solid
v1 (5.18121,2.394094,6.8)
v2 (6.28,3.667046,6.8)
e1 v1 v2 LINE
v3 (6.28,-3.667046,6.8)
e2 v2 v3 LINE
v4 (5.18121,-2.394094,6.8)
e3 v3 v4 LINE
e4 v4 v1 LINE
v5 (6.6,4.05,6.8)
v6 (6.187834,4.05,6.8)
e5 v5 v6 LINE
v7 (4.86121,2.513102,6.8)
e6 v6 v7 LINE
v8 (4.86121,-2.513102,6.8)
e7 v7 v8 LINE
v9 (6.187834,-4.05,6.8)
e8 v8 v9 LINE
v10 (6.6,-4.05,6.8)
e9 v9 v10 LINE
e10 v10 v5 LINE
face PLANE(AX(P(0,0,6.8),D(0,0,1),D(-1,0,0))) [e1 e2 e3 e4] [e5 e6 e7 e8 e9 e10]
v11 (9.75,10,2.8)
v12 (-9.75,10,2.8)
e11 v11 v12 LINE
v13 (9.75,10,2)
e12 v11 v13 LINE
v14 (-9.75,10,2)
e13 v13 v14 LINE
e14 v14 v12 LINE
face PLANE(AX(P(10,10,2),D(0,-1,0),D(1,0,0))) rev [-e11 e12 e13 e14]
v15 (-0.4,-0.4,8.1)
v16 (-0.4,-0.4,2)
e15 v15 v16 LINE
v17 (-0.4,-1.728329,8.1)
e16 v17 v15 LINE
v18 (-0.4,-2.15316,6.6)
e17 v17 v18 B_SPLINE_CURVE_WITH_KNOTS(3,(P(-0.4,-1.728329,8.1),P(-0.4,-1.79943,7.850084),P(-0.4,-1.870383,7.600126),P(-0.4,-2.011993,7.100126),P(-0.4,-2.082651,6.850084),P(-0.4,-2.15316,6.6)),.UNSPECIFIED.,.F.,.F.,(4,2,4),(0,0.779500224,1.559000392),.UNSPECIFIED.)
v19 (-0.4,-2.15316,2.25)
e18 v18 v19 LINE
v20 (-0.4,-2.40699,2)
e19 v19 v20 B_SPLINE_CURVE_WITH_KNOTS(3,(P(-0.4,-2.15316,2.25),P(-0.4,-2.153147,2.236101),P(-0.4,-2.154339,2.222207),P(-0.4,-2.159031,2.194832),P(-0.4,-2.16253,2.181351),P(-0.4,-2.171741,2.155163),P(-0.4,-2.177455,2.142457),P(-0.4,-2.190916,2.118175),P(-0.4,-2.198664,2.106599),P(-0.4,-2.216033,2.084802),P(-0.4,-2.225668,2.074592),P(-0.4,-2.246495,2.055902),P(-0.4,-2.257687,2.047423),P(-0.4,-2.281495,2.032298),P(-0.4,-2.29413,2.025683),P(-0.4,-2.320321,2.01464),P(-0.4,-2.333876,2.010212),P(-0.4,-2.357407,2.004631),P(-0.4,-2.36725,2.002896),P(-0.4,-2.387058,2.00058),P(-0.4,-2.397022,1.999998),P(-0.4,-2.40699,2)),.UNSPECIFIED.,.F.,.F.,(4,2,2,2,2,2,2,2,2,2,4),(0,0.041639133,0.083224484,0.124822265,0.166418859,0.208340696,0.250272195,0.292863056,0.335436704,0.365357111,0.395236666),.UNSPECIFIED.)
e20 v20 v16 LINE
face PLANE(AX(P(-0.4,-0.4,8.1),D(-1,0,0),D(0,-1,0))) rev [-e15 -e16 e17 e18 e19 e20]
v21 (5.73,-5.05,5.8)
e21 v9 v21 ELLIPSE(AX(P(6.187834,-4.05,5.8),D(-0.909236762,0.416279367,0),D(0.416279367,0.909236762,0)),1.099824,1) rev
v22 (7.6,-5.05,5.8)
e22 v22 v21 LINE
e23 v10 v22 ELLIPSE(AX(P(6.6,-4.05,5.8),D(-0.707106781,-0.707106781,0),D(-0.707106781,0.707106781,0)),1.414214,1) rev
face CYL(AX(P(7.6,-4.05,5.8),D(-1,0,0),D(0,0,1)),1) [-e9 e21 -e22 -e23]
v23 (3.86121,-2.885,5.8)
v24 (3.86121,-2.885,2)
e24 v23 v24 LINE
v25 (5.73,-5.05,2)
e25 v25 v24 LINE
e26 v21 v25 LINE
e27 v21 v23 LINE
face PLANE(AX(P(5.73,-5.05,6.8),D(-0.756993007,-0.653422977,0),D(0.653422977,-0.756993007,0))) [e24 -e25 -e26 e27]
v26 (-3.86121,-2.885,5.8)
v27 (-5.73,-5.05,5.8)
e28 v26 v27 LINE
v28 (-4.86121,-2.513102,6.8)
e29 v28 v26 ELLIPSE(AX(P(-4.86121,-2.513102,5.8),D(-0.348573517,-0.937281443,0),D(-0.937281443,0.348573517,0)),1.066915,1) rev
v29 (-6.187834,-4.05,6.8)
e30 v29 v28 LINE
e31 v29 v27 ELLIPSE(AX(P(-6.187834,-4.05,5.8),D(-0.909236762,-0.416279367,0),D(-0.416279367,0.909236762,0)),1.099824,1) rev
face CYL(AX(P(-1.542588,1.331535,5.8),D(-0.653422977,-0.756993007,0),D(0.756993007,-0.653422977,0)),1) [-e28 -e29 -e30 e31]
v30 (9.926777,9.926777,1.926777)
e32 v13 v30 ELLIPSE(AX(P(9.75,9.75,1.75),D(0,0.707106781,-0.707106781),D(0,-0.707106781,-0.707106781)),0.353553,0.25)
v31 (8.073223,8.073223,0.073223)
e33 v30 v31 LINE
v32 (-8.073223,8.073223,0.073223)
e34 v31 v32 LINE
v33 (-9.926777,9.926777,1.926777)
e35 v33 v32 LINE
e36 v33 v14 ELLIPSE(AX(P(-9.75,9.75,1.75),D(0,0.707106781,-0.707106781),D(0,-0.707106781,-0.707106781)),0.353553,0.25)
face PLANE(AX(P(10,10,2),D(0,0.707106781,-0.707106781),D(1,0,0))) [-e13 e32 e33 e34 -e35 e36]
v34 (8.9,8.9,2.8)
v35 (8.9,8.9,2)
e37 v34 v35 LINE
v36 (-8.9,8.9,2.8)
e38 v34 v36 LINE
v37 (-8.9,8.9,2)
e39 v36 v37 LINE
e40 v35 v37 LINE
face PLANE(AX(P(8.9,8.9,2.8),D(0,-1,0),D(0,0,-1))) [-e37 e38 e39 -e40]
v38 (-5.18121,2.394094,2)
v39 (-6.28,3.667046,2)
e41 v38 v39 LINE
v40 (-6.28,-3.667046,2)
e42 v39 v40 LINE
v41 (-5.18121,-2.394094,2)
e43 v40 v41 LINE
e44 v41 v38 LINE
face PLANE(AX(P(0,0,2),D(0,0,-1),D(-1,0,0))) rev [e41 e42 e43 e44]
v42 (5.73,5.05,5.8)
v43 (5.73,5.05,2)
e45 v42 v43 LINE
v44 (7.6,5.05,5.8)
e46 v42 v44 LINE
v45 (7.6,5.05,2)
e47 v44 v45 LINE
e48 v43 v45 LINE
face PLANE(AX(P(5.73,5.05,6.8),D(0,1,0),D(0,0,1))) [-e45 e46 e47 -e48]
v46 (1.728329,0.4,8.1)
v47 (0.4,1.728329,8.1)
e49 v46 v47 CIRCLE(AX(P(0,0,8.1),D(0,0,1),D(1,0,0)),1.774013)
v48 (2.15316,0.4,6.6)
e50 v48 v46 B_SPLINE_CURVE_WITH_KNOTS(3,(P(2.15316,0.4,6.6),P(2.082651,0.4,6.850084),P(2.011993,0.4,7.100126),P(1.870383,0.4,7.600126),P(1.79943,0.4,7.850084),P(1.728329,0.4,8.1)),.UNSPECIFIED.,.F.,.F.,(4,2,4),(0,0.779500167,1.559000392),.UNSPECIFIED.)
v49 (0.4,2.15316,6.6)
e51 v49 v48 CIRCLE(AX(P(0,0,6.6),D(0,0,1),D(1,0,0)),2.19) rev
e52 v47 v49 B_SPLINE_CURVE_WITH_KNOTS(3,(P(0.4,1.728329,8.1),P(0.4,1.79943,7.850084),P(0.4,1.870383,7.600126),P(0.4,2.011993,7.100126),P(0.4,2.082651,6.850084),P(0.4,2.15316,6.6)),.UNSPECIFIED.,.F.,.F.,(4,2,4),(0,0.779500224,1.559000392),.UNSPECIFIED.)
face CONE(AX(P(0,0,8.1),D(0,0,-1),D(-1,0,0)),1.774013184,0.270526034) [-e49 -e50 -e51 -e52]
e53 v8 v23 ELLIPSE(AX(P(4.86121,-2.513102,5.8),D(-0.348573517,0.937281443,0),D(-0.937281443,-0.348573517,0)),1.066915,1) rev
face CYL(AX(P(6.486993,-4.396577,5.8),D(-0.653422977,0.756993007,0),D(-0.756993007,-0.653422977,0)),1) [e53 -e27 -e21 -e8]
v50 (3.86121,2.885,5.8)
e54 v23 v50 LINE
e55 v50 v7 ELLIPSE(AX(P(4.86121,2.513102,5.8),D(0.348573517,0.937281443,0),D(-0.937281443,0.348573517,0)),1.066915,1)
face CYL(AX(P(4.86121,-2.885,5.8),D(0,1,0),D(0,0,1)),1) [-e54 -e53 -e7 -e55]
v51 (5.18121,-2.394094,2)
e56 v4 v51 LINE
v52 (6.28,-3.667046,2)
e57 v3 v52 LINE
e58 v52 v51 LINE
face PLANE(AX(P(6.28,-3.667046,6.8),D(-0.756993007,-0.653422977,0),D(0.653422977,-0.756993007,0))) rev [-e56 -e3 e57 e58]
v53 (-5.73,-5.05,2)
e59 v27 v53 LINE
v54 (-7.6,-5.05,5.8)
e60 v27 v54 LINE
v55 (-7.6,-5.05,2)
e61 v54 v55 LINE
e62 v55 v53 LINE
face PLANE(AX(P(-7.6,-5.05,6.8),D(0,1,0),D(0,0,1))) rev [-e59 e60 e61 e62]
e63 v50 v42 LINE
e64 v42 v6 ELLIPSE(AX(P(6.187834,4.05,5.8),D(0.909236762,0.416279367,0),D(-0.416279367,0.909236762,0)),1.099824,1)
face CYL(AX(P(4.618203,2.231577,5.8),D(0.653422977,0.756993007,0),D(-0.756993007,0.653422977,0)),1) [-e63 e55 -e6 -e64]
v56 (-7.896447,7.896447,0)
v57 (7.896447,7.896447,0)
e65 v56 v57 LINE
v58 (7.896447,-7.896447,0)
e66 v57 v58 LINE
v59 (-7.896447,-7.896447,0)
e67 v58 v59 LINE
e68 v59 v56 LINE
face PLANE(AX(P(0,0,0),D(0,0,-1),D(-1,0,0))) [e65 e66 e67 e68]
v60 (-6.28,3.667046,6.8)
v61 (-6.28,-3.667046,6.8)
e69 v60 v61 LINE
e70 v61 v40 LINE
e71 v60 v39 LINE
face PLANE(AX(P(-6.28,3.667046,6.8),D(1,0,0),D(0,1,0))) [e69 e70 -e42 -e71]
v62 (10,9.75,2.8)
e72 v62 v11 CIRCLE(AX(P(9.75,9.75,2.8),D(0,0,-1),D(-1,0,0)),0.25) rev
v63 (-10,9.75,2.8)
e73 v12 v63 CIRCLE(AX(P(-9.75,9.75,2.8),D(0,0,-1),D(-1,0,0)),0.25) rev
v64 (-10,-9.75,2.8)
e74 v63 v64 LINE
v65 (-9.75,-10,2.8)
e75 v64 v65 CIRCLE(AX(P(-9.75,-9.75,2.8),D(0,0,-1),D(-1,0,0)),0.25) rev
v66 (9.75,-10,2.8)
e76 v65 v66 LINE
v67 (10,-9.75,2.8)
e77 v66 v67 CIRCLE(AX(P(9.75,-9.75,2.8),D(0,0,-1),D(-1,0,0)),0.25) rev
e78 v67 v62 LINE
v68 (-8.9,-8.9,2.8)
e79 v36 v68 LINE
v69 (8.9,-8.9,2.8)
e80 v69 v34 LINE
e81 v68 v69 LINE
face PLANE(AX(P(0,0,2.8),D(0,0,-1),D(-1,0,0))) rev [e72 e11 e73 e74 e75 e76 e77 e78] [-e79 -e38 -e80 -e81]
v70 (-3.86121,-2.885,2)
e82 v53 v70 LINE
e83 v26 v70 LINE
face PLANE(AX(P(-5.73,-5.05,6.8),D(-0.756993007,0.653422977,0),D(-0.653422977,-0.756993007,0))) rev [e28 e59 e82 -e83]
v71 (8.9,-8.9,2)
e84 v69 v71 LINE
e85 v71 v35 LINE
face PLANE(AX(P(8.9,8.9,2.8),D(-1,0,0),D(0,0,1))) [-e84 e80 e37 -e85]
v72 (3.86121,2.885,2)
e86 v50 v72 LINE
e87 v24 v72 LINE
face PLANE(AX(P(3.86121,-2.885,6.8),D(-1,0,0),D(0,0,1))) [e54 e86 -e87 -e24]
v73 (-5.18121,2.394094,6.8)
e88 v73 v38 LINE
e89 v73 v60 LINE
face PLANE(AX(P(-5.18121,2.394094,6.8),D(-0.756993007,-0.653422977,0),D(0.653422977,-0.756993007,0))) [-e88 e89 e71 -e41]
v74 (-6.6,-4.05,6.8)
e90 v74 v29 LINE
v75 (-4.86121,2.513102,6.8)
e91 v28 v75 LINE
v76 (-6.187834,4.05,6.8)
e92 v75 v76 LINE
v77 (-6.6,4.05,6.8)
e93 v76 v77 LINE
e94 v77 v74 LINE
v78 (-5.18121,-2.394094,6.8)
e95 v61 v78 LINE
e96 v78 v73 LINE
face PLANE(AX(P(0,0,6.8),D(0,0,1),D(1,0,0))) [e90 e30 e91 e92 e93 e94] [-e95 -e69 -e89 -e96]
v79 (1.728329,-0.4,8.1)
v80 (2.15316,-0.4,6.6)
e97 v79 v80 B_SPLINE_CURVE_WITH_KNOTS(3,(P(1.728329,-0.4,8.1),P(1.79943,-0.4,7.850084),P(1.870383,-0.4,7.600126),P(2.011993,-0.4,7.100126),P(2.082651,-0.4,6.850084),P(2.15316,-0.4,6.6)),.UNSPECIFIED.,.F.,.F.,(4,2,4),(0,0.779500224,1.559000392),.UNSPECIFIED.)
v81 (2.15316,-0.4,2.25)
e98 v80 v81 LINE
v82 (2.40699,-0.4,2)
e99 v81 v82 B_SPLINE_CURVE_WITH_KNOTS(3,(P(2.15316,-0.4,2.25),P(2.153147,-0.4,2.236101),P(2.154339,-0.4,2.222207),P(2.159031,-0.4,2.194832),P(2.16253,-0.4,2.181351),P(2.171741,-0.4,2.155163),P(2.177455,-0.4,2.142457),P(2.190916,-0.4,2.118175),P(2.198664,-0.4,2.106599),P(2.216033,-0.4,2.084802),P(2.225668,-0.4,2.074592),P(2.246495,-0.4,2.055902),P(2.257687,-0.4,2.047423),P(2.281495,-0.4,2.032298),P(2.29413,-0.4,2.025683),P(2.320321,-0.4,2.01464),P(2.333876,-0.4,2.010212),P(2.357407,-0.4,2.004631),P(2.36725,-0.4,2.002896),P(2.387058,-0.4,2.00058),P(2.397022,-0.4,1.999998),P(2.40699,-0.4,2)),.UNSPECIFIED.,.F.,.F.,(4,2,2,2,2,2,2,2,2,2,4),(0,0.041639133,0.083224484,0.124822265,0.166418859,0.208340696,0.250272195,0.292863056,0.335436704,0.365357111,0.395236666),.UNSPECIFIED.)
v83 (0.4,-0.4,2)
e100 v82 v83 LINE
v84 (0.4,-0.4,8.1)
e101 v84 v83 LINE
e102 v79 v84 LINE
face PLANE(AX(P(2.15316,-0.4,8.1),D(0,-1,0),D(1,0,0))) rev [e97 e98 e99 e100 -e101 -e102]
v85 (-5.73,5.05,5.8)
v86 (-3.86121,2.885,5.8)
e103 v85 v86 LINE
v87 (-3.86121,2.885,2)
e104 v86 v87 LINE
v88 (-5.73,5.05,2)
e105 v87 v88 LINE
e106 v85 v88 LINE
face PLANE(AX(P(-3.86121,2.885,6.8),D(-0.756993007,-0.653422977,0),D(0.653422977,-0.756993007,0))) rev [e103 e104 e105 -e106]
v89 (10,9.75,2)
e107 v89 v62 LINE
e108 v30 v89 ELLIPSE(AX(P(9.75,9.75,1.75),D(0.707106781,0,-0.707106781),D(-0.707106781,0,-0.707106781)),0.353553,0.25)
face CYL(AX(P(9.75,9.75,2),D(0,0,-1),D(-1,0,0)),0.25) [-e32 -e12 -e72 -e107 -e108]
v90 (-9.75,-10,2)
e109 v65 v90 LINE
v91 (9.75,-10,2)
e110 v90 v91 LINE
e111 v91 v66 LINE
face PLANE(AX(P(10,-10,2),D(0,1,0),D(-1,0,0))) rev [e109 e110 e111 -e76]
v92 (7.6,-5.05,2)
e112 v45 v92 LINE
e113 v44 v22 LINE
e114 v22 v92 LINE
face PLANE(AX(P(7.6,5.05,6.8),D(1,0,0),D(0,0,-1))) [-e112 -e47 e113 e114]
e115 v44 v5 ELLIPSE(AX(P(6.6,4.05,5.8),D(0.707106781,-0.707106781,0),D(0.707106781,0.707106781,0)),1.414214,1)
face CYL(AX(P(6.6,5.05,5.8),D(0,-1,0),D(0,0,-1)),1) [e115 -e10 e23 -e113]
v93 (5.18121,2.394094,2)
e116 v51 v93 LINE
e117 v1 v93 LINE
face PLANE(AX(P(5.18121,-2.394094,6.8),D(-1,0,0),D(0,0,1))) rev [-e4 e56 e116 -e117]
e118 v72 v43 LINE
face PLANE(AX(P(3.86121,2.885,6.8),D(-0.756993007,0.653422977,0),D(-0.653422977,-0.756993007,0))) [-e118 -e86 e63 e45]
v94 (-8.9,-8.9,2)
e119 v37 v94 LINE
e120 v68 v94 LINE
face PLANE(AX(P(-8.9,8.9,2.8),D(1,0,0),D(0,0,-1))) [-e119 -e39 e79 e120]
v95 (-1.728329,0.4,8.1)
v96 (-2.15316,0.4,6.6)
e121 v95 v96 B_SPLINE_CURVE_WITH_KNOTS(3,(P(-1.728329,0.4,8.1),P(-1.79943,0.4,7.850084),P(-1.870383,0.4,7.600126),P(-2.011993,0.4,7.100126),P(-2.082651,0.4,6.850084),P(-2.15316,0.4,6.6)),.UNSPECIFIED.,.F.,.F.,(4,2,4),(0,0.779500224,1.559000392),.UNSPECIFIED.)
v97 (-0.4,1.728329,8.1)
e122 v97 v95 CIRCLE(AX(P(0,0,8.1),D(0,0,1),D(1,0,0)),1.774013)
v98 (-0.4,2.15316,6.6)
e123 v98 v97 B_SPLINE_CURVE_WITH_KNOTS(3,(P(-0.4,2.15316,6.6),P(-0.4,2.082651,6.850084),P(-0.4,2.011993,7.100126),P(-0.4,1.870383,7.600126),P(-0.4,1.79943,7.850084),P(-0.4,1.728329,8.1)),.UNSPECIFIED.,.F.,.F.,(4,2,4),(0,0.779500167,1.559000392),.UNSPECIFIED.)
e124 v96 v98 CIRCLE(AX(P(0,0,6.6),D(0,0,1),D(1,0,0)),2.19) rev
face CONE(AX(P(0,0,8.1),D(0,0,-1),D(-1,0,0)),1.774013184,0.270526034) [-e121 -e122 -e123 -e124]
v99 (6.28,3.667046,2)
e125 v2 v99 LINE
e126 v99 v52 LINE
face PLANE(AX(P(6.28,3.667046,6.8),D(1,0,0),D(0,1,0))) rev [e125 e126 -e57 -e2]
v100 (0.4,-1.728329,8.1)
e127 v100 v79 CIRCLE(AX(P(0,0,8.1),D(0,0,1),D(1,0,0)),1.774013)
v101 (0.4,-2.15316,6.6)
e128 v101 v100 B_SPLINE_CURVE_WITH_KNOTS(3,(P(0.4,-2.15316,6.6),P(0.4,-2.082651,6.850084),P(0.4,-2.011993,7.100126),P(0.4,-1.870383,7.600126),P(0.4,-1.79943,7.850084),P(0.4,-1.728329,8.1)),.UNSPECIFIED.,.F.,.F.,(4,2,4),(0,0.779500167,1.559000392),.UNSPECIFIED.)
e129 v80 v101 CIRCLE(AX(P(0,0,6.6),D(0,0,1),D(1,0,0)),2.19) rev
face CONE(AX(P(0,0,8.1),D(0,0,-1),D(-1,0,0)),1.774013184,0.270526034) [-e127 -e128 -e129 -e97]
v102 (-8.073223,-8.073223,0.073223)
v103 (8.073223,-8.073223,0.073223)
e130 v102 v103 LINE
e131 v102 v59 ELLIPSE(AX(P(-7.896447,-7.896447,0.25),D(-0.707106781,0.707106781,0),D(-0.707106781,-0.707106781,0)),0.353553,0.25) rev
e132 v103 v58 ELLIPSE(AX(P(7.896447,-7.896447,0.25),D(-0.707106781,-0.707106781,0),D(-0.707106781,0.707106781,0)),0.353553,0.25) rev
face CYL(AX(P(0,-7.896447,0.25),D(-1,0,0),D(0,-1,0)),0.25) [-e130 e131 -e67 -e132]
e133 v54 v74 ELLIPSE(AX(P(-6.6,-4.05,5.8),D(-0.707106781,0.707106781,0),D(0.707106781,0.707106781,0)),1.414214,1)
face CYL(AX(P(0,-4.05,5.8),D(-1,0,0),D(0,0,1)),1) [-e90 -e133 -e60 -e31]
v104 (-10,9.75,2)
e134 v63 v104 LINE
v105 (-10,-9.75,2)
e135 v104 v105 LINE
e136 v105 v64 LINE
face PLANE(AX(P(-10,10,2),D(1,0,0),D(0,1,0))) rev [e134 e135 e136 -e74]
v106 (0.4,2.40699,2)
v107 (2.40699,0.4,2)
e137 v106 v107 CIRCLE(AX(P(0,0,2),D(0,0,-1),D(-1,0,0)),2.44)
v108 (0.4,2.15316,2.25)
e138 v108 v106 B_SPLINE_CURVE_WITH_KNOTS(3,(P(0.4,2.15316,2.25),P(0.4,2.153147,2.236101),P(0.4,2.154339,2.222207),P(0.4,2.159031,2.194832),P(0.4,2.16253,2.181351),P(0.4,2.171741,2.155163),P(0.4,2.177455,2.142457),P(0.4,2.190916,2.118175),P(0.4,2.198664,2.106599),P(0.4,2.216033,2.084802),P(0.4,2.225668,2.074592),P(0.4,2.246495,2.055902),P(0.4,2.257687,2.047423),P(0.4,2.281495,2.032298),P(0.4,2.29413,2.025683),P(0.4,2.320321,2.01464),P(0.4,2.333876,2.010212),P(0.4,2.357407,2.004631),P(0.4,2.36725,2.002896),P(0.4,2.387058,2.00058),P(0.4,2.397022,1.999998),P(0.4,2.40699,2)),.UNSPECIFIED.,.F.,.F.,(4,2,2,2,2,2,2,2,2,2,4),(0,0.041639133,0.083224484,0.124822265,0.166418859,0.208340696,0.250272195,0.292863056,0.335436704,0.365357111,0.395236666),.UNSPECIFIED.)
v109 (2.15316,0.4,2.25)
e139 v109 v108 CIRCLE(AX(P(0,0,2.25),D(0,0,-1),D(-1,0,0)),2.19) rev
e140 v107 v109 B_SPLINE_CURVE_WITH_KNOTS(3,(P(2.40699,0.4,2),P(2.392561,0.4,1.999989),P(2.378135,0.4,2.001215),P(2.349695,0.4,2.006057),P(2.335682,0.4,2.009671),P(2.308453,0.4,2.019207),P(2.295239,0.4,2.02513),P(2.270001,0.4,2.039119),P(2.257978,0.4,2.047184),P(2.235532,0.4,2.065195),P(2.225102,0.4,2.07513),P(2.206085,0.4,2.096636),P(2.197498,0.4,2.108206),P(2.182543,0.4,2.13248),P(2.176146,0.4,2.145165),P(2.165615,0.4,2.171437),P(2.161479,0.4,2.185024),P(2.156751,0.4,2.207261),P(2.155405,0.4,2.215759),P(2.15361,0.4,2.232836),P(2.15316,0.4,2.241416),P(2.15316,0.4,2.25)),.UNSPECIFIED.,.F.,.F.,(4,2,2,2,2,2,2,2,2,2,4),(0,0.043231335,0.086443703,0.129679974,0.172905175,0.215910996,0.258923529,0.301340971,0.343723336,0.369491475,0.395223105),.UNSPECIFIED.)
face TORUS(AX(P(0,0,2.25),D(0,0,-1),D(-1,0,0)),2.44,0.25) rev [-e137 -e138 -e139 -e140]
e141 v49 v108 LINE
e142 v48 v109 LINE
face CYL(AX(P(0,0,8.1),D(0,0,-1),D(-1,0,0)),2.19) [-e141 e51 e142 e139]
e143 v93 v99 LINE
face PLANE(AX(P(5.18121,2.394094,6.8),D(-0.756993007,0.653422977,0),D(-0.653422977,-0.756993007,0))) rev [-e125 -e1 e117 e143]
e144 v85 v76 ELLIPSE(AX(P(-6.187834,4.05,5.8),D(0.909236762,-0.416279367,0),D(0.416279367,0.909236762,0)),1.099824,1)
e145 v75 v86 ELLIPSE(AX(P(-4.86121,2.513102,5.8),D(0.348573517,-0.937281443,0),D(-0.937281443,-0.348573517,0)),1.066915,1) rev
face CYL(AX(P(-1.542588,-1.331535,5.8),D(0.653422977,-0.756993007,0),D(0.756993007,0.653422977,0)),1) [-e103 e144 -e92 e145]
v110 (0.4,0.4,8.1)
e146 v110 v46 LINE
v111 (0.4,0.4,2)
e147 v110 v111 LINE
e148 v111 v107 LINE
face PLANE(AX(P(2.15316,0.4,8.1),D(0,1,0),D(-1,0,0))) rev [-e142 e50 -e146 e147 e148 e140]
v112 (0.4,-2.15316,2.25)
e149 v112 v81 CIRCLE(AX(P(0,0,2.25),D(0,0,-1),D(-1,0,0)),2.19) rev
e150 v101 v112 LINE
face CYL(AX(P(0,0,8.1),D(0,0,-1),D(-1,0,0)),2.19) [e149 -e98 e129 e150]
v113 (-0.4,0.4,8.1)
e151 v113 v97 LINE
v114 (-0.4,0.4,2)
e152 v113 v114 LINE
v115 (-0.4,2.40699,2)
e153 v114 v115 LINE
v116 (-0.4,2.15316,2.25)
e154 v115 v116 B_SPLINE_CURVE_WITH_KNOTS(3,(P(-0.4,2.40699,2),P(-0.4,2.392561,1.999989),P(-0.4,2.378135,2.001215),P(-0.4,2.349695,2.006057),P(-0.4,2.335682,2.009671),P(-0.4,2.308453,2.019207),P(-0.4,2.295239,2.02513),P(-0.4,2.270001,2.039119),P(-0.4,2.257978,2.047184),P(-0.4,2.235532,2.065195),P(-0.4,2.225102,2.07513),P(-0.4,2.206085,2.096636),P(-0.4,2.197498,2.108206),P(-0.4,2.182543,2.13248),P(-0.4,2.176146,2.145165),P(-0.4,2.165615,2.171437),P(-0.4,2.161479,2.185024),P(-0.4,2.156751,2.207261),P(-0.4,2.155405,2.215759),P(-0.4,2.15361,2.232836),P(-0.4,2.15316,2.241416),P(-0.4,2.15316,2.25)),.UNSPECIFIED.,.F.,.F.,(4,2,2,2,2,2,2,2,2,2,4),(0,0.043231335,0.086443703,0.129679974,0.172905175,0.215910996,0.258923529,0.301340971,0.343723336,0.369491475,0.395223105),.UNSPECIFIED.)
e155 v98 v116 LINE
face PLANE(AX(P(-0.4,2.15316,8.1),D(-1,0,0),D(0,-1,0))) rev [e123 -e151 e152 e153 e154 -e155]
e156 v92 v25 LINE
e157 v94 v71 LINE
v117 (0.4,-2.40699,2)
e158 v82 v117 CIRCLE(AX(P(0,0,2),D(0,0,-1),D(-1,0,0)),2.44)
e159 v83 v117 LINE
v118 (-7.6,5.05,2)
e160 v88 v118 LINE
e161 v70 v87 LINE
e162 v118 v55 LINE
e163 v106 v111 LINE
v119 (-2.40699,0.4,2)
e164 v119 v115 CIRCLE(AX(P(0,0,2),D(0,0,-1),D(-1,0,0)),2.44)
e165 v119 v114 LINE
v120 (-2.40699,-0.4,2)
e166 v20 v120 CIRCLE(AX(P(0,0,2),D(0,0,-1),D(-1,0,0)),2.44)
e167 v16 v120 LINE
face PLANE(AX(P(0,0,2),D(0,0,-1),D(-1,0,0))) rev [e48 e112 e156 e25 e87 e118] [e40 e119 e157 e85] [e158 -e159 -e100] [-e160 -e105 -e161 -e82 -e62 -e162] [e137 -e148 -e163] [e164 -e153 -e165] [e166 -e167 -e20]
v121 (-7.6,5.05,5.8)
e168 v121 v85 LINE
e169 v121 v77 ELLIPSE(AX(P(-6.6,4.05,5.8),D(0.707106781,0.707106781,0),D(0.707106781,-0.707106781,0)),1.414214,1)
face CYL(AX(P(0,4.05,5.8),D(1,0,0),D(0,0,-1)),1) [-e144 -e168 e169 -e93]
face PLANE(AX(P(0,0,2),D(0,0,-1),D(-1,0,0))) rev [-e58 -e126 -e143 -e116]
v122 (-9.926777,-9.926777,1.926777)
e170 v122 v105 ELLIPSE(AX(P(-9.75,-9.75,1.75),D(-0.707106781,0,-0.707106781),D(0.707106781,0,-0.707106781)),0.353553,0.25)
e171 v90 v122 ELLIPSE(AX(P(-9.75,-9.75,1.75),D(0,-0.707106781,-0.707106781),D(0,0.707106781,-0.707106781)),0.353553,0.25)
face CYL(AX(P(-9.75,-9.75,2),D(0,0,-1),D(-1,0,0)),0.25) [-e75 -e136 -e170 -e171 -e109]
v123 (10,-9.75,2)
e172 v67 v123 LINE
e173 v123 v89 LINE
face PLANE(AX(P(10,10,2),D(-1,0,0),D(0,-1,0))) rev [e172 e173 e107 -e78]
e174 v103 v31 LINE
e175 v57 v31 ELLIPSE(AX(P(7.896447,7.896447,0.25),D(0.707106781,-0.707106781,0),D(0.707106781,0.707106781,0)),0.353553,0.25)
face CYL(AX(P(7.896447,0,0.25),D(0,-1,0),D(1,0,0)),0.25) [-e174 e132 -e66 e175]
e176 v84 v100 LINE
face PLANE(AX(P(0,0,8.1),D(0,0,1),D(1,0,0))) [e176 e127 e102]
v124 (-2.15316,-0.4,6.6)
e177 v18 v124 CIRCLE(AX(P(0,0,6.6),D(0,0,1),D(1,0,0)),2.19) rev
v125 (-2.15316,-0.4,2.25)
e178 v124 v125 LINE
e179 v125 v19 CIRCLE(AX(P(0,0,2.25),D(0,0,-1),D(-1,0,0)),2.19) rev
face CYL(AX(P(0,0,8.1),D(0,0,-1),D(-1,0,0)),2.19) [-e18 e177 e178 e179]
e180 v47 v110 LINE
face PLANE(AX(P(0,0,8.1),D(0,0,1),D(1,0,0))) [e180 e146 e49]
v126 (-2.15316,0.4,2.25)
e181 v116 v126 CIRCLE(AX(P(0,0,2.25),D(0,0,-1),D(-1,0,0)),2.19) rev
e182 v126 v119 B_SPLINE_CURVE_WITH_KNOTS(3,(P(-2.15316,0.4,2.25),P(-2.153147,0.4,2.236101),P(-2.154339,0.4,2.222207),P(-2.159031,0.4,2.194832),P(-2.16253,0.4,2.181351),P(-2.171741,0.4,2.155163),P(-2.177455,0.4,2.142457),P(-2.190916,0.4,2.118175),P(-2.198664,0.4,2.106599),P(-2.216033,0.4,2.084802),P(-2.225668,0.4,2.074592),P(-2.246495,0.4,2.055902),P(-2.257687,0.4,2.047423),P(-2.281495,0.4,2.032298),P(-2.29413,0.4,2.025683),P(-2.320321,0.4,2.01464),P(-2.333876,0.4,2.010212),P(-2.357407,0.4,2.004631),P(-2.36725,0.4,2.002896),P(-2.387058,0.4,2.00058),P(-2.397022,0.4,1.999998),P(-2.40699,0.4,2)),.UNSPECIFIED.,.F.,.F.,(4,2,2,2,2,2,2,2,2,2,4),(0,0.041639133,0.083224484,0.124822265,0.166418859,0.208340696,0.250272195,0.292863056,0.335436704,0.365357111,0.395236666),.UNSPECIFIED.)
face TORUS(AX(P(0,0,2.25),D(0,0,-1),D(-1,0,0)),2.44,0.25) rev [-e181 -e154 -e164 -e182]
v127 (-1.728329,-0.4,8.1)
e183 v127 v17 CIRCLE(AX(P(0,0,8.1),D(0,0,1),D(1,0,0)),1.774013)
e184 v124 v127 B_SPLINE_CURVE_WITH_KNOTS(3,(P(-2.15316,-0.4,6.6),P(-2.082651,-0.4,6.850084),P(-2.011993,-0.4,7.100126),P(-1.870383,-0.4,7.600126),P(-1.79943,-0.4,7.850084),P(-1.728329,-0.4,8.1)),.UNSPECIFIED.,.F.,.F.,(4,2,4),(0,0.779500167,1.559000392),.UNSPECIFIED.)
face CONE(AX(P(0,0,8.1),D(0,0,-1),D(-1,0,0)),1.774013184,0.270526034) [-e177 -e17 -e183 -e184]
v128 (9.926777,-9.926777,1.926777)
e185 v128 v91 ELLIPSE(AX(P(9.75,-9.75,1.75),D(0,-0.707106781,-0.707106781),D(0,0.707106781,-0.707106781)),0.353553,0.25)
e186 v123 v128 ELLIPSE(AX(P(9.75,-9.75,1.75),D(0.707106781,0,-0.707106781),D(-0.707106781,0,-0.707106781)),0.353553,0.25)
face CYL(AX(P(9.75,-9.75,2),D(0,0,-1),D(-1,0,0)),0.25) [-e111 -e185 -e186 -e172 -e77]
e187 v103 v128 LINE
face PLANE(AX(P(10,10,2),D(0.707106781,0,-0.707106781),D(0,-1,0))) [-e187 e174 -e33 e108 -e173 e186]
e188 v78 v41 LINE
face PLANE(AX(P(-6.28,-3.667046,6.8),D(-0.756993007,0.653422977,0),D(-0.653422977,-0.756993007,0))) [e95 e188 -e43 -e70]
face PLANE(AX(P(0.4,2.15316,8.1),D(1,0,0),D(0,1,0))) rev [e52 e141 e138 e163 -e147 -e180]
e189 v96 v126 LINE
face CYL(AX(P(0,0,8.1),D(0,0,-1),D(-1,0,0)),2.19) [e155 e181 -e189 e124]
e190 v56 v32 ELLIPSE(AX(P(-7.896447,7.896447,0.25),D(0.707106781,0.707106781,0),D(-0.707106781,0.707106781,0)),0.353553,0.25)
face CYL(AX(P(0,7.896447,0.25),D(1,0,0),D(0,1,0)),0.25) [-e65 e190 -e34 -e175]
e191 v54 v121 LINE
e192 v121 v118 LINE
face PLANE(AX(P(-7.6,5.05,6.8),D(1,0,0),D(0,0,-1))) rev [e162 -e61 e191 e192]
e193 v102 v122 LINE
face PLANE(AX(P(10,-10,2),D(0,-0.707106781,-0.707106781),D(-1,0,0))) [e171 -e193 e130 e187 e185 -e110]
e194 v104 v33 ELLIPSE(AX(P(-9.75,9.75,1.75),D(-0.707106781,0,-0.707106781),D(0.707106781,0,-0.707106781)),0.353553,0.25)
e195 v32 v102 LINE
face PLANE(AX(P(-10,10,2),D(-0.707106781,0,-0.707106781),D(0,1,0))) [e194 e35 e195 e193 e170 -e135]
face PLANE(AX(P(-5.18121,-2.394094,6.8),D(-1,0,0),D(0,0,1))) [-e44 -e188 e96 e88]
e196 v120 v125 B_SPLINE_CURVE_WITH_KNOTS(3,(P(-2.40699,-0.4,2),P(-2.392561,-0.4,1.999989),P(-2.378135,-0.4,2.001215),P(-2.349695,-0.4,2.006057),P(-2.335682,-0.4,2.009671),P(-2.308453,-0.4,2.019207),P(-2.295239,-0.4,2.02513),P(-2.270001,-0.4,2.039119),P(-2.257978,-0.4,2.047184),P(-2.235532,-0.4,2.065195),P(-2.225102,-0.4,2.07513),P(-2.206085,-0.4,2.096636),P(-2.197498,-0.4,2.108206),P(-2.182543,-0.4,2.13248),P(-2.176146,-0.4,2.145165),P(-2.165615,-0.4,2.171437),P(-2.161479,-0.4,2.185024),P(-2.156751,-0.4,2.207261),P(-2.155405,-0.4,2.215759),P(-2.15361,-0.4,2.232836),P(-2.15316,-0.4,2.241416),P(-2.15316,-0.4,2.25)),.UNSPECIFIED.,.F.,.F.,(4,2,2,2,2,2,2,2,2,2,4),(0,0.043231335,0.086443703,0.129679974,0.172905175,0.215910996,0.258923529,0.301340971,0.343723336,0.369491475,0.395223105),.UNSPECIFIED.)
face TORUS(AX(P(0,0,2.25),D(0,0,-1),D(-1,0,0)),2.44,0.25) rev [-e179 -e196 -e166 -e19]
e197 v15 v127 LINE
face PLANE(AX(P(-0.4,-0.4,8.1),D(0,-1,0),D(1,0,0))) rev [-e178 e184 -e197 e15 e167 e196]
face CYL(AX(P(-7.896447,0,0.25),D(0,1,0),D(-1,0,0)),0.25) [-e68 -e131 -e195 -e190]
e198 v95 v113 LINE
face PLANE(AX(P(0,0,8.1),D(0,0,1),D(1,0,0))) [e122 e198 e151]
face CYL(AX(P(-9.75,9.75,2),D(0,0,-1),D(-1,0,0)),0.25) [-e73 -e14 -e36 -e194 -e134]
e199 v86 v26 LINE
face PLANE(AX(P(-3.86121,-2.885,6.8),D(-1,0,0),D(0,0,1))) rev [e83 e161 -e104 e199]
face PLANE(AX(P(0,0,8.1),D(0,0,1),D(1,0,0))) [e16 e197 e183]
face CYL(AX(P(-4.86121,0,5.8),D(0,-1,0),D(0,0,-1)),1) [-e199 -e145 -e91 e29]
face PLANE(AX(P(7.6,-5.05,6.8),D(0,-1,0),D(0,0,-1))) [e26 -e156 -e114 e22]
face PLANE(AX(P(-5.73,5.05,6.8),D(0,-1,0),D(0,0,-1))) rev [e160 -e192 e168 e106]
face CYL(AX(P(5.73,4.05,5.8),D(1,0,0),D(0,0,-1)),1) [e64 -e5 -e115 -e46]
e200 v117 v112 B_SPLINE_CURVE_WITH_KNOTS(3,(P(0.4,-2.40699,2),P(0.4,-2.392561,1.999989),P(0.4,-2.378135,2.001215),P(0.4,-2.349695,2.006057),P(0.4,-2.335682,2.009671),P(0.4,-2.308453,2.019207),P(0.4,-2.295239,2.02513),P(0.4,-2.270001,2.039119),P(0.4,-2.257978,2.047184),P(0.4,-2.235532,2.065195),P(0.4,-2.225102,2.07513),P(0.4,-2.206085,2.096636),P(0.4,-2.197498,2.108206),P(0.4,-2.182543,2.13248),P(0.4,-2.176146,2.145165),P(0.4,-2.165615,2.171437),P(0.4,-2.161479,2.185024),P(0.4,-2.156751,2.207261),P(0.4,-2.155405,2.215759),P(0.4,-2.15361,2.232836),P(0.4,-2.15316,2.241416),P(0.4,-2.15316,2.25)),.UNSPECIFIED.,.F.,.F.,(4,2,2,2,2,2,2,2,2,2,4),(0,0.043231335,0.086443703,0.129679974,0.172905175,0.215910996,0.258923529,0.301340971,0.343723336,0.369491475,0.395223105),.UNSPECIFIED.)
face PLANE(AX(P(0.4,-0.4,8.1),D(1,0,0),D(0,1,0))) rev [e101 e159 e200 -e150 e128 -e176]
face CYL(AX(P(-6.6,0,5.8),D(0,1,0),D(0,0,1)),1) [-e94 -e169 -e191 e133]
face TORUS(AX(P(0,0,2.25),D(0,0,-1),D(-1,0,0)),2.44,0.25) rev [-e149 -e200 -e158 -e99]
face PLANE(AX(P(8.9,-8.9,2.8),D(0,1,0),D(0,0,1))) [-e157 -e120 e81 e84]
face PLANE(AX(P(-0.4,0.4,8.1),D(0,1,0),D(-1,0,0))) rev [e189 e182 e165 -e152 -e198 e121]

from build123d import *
from OCP.BRepFilletAPI import BRepFilletAPI_MakeChamfer

# Parameters (mm, degrees)
SKETCH3_W           = 20
SKETCH3_H           = 20
BOSS_EXTRUDE1_DEPTH = 2
SKETCH4_W           = 20
SKETCH4_H           = 20
SKETCH4_W_2         = 17.8
SKETCH4_H_2         = 17.8
BOSS_EXTRUDE2_DEPTH = 0.8
CHAMFER1_SIZE       = 2
BOSS_EXTRUDE3_DEPTH = 4.8
FILLET2_R           = 1
FILLET4_R           = 1
BOSS_EXTRUDE4_DEPTH = 6.1
CHAMFER2_SIZE       = 1.5
CHAMFER2_SIZE2      = 0.415986816
FILLET5_R           = 0.25
FILLET6_R           = 0.25


with BuildPart() as part:
    # Sketch3 → Boss-Extrude1 (new body)
    with BuildSketch(Plane.XY):
        Rectangle(SKETCH3_W, SKETCH3_H)
    extrude(amount=BOSS_EXTRUDE1_DEPTH)

    # Sketch4 → Boss-Extrude2 (add)
    with BuildSketch(Plane.XY.offset(2)):
        Rectangle(SKETCH4_W, SKETCH4_H)
        Rectangle(SKETCH4_W_2, SKETCH4_H_2, mode=Mode.SUBTRACT)
    extrude(amount=BOSS_EXTRUDE2_DEPTH)

    # Chamfer1
    chamfer1_edges = [part.edges().sort_by_distance(p)[0] for p in [
        (0, 10, 0),
        (10, 0, 0),
        (0, -10, 0),
        (-10, 0, 0),
    ]]
    chamfer(chamfer1_edges, length=CHAMFER1_SIZE)

    # Sketch7 → Boss-Extrude3 (add)
    with BuildSketch(Plane.XY.offset(2)):
        Polygon((-7.6, 5.05), (-7.6, -5.05), (-5.73, -5.05), (-3.861210285, -2.885), (-3.861210285, 2.885), (-5.73, 5.05), align=None)
        Polygon((-5.181210285, -2.394094045), (-5.181210285, 2.394094045), (-6.28, 3.667046113), (-6.28, -3.667046113), align=None, mode=Mode.SUBTRACT)
    boss_extrude3 = extrude(amount=BOSS_EXTRUDE3_DEPTH)

    # Mirror1: Boss-Extrude3 across plane
    add(boss_extrude3.mirror(Plane(origin=(0, 0, 0), x_dir=(0, 0, 1), z_dir=(1, 0, 0))))

    # Fillet2
    fillet2_edges = [part.edges().sort_by_distance(p)[0] for p in [
        (-6.665, 5.05, 6.8),
        (-7.6, 0, 6.8),
        (-6.665, -5.05, 6.8),
        (-4.795605142, -3.9675, 6.8),
        (-3.861210285, 0, 6.8),
        (-4.795605142, 3.9675, 6.8),
    ]]
    fillet(fillet2_edges, radius=FILLET2_R)

    # Fillet4
    fillet4_edges = [part.edges().sort_by_distance(p)[0] for p in [
        (6.665, 5.05, 6.8),
        (4.795605142, 3.9675, 6.8),
        (3.861210285, 0, 6.8),
        (4.795605142, -3.9675, 6.8),
        (6.665, -5.05, 6.8),
        (7.6, 0, 6.8),
    ]]
    fillet(fillet4_edges, radius=FILLET4_R)

    # Sketch8 → Boss-Extrude4 (add)
    with BuildSketch(Plane.XY.offset(2)):
        with BuildLine():
            Line((-0.4, 2.153160468), (-0.4, 0.4))
            Line((-0.4, 0.4), (-2.153160468, 0.4))
            ThreePointArc((-2.153160468, 0.4), (-1.548563851, 1.548563851), (-0.4, 2.153160468))
        make_face()
        with BuildLine():
            Line((0.4, 2.153160468), (0.4, 0.4))
            Line((0.4, 0.4), (2.153160468, 0.4))
            ThreePointArc((2.153160468, 0.4), (1.548563851, 1.548563851), (0.4, 2.153160468))
        make_face()
        with BuildLine():
            Line((2.153160468, -0.4), (0.4, -0.4))
            Line((0.4, -0.4), (0.4, -2.153160468))
            ThreePointArc((0.4, -2.153160468), (1.548563851, -1.548563851), (2.153160468, -0.4))
        make_face()
        with BuildLine():
            Line((-0.4, -0.4), (-2.153160468, -0.4))
            ThreePointArc((-2.153160468, -0.4), (-1.548563851, -1.548563851), (-0.4, -2.153160468))
            Line((-0.4, -2.153160468), (-0.4, -0.4))
        make_face()
    extrude(amount=BOSS_EXTRUDE4_DEPTH)

    # Chamfer2: one chamfer whose edges measure the first distance from different faces: ONE call of the kernel's chamfer builder (chamfer() names one face for all edges)
    chamfer2_edges_1 = [part.edges().sort_by_distance(p)[0] for p in [
        (1.548563851, 1.548563851, 8.1),
    ]]
    chamfer2_side_1 = [part.faces().sort_by_distance(p)[0] for p in [
        (1.548563851, 1.548563851, 5.05),
    ]]
    chamfer2_edges_2 = [part.edges().sort_by_distance(p)[0] for p in [
        (-1.548563851, 1.548563851, 8.1),
    ]]
    chamfer2_side_2 = [part.faces().sort_by_distance(p)[0] for p in [
        (-1.548563851, 1.548563851, 5.05),
    ]]
    chamfer2_edges_3 = [part.edges().sort_by_distance(p)[0] for p in [
        (1.548563851, -1.548563851, 8.1),
    ]]
    chamfer2_side_3 = [part.faces().sort_by_distance(p)[0] for p in [
        (1.548563851, -1.548563851, 5.05),
    ]]
    chamfer2_edges_4 = [part.edges().sort_by_distance(p)[0] for p in [
        (-1.548563851, -1.548563851, 8.1),
    ]]
    chamfer2_side_4 = [part.faces().sort_by_distance(p)[0] for p in [
        (-1.548563851, -1.548563851, 5.05),
    ]]
    chamfer2 = BRepFilletAPI_MakeChamfer(part.part.solid().wrapped)
    for e in chamfer2_edges_1:
        chamfer2.Add(CHAMFER2_SIZE, CHAMFER2_SIZE2, e.wrapped, chamfer2_side_1[0].wrapped)  # the first distance lies on this face
    for e in chamfer2_edges_2:
        chamfer2.Add(CHAMFER2_SIZE, CHAMFER2_SIZE2, e.wrapped, chamfer2_side_2[0].wrapped)  # the first distance lies on this face
    for e in chamfer2_edges_3:
        chamfer2.Add(CHAMFER2_SIZE, CHAMFER2_SIZE2, e.wrapped, chamfer2_side_3[0].wrapped)  # the first distance lies on this face
    for e in chamfer2_edges_4:
        chamfer2.Add(CHAMFER2_SIZE, CHAMFER2_SIZE2, e.wrapped, chamfer2_side_4[0].wrapped)  # the first distance lies on this face
    add(Compound.cast(chamfer2.Shape()), mode=Mode.REPLACE)

    # Fillet5
    # the kernel refuses this fillet: 0.25 mm, written as the material it adds along each edge
    with BuildSketch(Plane(origin=(0, 0, 2), x_dir=(0.9948253006506458, -0.10160030110857103, 0), z_dir=(-0.10160030110857103, -0.9948253006506458, 0))) as fillet5_piece_1_section:
        with BuildLine():
            CenterArc((2.19 + FILLET5_R, FILLET5_R), FILLET5_R, 180, 90)
            Line((2.19, FILLET5_R), (2.19, 0))
            Line((2.19, 0), (2.19 + FILLET5_R, 0))
        make_face()
    fillet5_piece_1 = revolve(axis=Axis((0, 0, 2), (0, 0, 1)), revolution_arc=101.662660771, mode=Mode.PRIVATE)
    fillet5_piece_1 = split(fillet5_piece_1, bisect_by=Plane(origin=(0.4, 1.598681541, 2.070877118), z_dir=(1, 0, 0)), keep=Keep.TOP, mode=Mode.PRIVATE)
    fillet5_piece_1 = split(fillet5_piece_1, bisect_by=Plane(origin=(1.598681541, 0.4, 2.070877118), z_dir=(0, 1, 0)), keep=Keep.TOP, mode=Mode.PRIVATE)
    add(fillet5_piece_1)
    with BuildSketch(Plane(origin=(0, 0, 2), x_dir=(-0.9948253006506458, -0.10160030110857048, 0), z_dir=(0.10160030110857048, -0.9948253006506458, 0))) as fillet5_piece_2_section:
        with BuildLine():
            CenterArc((2.19 + FILLET5_R, -FILLET5_R), FILLET5_R, 90, 90)
            Line((2.19, -FILLET5_R), (2.19, 0))
            Line((2.19, 0), (2.19 + FILLET5_R, 0))
        make_face()
    fillet5_piece_2 = revolve(axis=Axis((0, 0, 2), (0, 0, -1)), revolution_arc=101.662660771, mode=Mode.PRIVATE)
    fillet5_piece_2 = split(fillet5_piece_2, bisect_by=Plane(origin=(-1.598681541, 0.4, 2.070877118), z_dir=(0, 1, 0)), keep=Keep.TOP, mode=Mode.PRIVATE)
    fillet5_piece_2 = split(fillet5_piece_2, bisect_by=Plane(origin=(-0.4, 1.598681541, 2.070877118), z_dir=(-1, 0, 0)), keep=Keep.TOP, mode=Mode.PRIVATE)
    add(fillet5_piece_2)
    with BuildSketch(Plane(origin=(0, 0, 2), x_dir=(-0.1016003011085696, -0.9948253006506458, 0), z_dir=(-0.9948253006506458, 0.1016003011085696, 0))) as fillet5_piece_3_section:
        with BuildLine():
            CenterArc((2.19 + FILLET5_R, FILLET5_R), FILLET5_R, 180, 90)
            Line((2.19, FILLET5_R), (2.19, 0))
            Line((2.19, 0), (2.19 + FILLET5_R, 0))
        make_face()
    fillet5_piece_3 = revolve(axis=Axis((0, 0, 2), (0, 0, 1)), revolution_arc=101.662660771, mode=Mode.PRIVATE)
    fillet5_piece_3 = split(fillet5_piece_3, bisect_by=Plane(origin=(1.598681541, -0.4, 2.070877118), z_dir=(0, -1, 0)), keep=Keep.TOP, mode=Mode.PRIVATE)
    fillet5_piece_3 = split(fillet5_piece_3, bisect_by=Plane(origin=(0.4, -1.598681541, 2.070877118), z_dir=(1, 0, 0)), keep=Keep.TOP, mode=Mode.PRIVATE)
    add(fillet5_piece_3)
    with BuildSketch(Plane(origin=(0, 0, 2), x_dir=(-0.994825300650646, 0.10160030110856982, 0), z_dir=(0.10160030110856982, 0.994825300650646, 0))) as fillet5_piece_4_section:
        with BuildLine():
            CenterArc((2.19 + FILLET5_R, FILLET5_R), FILLET5_R, 180, 90)
            Line((2.19 + FILLET5_R, 0), (2.19, 0))
            Line((2.19, 0), (2.19, FILLET5_R))
        make_face()
    fillet5_piece_4 = revolve(axis=Axis((0, 0, 2), (0, 0, 1)), revolution_arc=101.662660771, mode=Mode.PRIVATE)
    fillet5_piece_4 = split(fillet5_piece_4, bisect_by=Plane(origin=(-0.4, -1.598681541, 2.070877118), z_dir=(-1, 0, 0)), keep=Keep.TOP, mode=Mode.PRIVATE)
    fillet5_piece_4 = split(fillet5_piece_4, bisect_by=Plane(origin=(-1.598681541, -0.4, 2.070877118), z_dir=(0, -1, 0)), keep=Keep.TOP, mode=Mode.PRIVATE)
    add(fillet5_piece_4)

    # Fillet6
    fillet6_edges = [part.edges().sort_by_distance(p)[0] for p in [
        (8, 0, 0),
        (0, 8, 0),
        (0, -8, 0),
        (-8, 0, 0),
        (-10, 10, 2.4),
        (10, 10, 2.4),
        (10, -10, 2.4),
        (-10, -10, 2.4),
    ]]
    fillet(fillet6_edges, radius=FILLET6_R)


solid = part.part
